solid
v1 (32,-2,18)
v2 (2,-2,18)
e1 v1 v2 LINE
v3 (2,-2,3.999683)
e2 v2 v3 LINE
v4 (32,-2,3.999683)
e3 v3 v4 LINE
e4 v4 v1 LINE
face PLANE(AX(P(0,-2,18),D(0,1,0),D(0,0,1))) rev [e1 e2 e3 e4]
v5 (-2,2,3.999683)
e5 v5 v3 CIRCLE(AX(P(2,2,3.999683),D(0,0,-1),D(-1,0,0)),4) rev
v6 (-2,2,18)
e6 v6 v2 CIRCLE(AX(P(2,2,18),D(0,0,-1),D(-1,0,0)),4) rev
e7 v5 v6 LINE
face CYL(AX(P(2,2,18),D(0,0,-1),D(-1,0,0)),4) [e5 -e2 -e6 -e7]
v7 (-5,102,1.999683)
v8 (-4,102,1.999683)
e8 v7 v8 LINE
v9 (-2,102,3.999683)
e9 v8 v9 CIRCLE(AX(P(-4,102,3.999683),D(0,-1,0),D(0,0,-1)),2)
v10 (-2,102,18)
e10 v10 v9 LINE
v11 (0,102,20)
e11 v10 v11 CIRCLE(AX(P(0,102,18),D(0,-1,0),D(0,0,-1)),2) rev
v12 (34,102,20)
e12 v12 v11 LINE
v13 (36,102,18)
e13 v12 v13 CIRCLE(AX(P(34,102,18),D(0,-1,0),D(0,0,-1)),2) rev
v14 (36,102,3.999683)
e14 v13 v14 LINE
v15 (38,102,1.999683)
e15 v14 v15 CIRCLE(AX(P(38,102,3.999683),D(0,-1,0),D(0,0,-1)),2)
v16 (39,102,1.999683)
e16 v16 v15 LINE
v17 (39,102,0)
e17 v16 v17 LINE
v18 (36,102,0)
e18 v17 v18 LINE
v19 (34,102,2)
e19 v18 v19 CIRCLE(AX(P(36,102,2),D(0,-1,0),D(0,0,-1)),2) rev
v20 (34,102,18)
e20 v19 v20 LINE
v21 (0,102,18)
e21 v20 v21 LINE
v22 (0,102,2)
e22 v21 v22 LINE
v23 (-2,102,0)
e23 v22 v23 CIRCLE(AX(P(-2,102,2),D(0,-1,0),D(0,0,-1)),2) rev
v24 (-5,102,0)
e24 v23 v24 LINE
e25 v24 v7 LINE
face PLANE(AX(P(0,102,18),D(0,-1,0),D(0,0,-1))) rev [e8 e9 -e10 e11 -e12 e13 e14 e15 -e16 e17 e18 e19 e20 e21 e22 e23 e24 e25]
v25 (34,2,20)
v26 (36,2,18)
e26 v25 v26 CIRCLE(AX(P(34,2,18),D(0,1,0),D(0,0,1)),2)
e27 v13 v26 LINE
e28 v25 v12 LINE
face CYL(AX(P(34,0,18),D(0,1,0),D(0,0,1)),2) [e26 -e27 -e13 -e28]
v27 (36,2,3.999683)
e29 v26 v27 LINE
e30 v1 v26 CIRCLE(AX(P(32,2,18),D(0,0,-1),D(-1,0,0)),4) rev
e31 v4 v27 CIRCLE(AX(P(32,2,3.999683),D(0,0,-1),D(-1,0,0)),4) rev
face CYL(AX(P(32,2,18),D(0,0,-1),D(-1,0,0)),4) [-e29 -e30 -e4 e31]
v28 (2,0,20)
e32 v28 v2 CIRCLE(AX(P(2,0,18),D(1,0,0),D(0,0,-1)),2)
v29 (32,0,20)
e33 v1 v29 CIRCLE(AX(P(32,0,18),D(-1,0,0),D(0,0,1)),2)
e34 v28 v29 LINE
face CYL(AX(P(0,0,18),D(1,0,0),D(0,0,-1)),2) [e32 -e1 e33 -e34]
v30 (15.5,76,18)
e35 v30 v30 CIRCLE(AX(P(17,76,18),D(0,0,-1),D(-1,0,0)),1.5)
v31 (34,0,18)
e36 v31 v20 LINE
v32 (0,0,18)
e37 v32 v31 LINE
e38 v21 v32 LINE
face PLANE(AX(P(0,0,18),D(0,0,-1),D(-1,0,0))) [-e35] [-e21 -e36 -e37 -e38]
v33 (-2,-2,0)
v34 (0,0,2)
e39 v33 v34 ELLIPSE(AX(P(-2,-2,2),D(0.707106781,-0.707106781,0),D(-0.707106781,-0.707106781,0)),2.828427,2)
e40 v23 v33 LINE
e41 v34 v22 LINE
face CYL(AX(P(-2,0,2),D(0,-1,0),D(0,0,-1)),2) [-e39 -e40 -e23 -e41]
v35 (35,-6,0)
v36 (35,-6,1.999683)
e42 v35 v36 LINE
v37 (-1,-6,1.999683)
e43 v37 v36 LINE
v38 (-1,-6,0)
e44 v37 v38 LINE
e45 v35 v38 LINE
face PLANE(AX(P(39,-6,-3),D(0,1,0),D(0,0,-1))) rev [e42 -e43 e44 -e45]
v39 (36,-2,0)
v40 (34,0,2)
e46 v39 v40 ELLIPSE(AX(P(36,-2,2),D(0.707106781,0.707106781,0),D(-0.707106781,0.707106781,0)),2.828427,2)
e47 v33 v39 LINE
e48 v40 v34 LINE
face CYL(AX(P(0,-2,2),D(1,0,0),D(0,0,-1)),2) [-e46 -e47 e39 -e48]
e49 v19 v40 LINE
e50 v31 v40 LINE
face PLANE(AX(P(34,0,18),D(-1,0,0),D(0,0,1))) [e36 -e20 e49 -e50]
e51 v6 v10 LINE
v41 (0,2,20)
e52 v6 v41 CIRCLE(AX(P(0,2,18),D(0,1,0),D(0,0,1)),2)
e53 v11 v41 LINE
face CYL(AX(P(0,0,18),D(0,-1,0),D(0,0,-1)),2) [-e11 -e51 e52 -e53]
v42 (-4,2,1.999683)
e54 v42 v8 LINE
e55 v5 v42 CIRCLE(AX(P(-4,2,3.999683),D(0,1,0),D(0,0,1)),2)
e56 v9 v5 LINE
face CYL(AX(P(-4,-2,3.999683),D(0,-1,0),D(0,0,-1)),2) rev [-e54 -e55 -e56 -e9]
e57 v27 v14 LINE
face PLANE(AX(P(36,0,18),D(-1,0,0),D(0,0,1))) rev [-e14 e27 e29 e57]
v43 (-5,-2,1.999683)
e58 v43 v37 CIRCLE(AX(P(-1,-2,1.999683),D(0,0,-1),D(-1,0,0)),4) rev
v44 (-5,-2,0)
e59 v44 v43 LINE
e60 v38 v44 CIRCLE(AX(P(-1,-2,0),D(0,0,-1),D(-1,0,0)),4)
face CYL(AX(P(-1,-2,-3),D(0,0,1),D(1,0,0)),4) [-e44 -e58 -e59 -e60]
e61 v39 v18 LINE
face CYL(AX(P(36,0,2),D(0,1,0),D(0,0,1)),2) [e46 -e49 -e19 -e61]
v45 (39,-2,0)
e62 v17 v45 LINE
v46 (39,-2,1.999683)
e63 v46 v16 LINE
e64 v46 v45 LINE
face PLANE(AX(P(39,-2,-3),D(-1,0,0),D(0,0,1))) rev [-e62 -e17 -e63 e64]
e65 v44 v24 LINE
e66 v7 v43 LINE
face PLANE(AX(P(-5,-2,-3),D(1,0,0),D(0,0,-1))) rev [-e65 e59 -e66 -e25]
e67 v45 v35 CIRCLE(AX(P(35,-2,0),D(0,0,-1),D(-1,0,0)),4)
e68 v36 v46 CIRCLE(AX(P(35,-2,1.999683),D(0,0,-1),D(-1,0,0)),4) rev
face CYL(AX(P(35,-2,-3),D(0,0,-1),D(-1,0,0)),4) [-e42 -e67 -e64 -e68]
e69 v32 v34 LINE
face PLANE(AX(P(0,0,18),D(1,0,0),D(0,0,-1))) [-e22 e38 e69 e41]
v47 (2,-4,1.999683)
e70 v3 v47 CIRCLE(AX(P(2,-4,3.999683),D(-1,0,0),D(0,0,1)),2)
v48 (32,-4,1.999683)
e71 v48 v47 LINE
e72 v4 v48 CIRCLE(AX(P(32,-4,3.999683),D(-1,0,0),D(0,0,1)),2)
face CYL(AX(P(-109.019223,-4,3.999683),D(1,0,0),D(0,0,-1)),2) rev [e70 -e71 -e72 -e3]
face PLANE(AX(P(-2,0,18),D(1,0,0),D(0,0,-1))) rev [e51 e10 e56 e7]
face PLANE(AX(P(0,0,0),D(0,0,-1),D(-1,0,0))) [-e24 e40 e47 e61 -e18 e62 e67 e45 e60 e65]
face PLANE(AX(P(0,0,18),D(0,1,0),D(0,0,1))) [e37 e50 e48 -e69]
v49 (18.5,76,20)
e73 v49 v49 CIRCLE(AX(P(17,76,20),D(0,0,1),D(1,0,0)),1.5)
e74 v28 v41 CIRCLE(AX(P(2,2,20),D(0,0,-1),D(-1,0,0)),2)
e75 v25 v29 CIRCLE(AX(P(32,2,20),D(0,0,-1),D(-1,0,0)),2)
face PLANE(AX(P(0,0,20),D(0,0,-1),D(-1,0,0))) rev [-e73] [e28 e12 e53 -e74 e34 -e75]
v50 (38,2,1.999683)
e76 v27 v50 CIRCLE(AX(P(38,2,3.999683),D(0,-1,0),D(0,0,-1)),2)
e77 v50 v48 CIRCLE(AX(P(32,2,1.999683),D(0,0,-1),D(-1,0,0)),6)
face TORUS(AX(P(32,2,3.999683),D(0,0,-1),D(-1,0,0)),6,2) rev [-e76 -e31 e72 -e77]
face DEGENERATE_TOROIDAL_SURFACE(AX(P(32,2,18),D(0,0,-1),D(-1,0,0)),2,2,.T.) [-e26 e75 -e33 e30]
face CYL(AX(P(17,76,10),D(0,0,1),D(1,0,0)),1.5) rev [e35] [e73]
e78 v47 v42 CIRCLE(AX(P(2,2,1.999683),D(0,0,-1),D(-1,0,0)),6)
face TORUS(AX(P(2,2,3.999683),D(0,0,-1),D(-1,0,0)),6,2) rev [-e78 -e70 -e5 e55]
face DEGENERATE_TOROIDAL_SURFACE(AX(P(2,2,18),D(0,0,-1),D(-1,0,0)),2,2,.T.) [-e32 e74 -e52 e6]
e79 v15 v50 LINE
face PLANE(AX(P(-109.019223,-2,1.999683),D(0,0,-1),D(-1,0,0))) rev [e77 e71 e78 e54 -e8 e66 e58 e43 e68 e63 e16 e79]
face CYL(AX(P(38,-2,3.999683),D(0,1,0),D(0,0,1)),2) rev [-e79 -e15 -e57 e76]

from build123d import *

# Parameters (mm, degrees)
ESQUISSE1_W             = 34
ESQUISSE1_H             = 100
BOSS_EXTRU_1_DEPTH      = 18
COQUE1_T                = 2
ESQUISSE2_W             = 34
ESQUISSE2_H             = 18
ENL_V_MAT_EXTRU_1_DEPTH = 18
CONG_1_R                = 2
ESQUISSE5_W             = 1.999683034
ESQUISSE5_H             = 104
BOSS_EXTRU_2_DEPTH      = 3
ESQUISSE6_W             = 1.999683034
ESQUISSE6_H             = 104
BOSS_EXTRU_3_DEPTH      = 3
ESQUISSE7_W             = 44
ESQUISSE7_H             = 1.999683034
BOSS_EXTRU_4_DEPTH      = 4
CONG_2_R                = 4
CONG_3_R                = 2
CONG_5_R                = 2
ESQUISSE8_R             = 1.5
ENL_V_MAT_EXTRU_2_DEPTH = 10


with BuildPart() as part:
    # Esquisse1 → Boss.-Extru.1 (new body)
    with BuildSketch(Plane.XY):
        with Locations((17, 50)):
            Rectangle(ESQUISSE1_W, ESQUISSE1_H)
    extrude(amount=BOSS_EXTRU_1_DEPTH)

    # Coque1
    coque1_openings = [part.faces().sort_by_distance(p)[0] for p in [
        (17, 50, 0),
    ]]
    offset(amount=COQUE1_T, openings=coque1_openings, kind=Kind.INTERSECTION)

    # Esquisse2 → Enlèv. mat.-Extru.1 (cut)
    with BuildSketch(Plane.XZ.offset(-100)):
        with Locations((17, 9)):
            Rectangle(ESQUISSE2_W, ESQUISSE2_H)
    extrude(amount=-ENL_V_MAT_EXTRU_1_DEPTH, mode=Mode.SUBTRACT)

    # Congé1
    cong_1_edges = [part.edges().sort_by_distance(p)[0] for p in [
        (36, 50, 20),
        (-2, 50, 20),
        (17, -2, 20),
    ]]
    fillet(cong_1_edges, radius=CONG_1_R)

    # Esquisse5 → Boss.-Extru.2 (add)
    with BuildSketch(Plane.ZY.offset(2)):
        with Locations((0.999841517, 50)):
            Rectangle(ESQUISSE5_W, ESQUISSE5_H)
    extrude(amount=BOSS_EXTRU_2_DEPTH)

    # Esquisse6 → Boss.-Extru.3 (add)
    with BuildSketch(Plane(origin=(36, 0, 0), x_dir=(0, 0, -1), z_dir=(1, 0, 0))):
        with Locations((-0.999841517, 50)):
            Rectangle(ESQUISSE6_W, ESQUISSE6_H)
    extrude(amount=BOSS_EXTRU_3_DEPTH)

    # Esquisse7 → Boss.-Extru.4 (add)
    with BuildSketch(Plane.XZ.offset(2)):
        with Locations((17, 0.999841517)):
            Rectangle(ESQUISSE7_W, ESQUISSE7_H)
    extrude(amount=BOSS_EXTRU_4_DEPTH)

    # Congé2
    # the kernel refuses this fillet: 4 mm, written as the material it takes off along each edge
    with BuildSketch(Plane(origin=(2, 2, 20), x_dir=(-1, 0, 0), z_dir=(0, 1, 0))) as cong_2_piece_1:
        with BuildLine():
            CenterArc((2, -2), 2, 0, 90)
            Line((4, -2), (4, 0))
            Line((4, 0), (2, 0))
        make_face()
    revolve(axis=Axis((2, 2, 20), (0, 0, 1)), revolution_arc=90, mode=Mode.SUBTRACT)
    with BuildSketch(Plane(origin=(32, 2, 20), x_dir=(0, -1, 0), z_dir=(-1, 0, 0))) as cong_2_piece_2:
        with BuildLine():
            CenterArc((2, -2), 2, 0, 90)
            Line((4, -2), (4, 0))
            Line((4, 0), (2, 0))
        make_face()
    revolve(axis=Axis((32, 2, 20), (0, 0, 1)), revolution_arc=90, mode=Mode.SUBTRACT)
    with BuildSketch(Plane(origin=(36, -2, 1.999683034), x_dir=(-1, 0, 0), z_dir=(0, 0, 1)), Plane(origin=(-2, -2, 20), x_dir=(1, 0, 0), z_dir=(0, 0, -1))) as cong_2_piece_3:
        with BuildLine():
            CenterArc((CONG_2_R, -CONG_2_R), CONG_2_R, 90, 90)
            Line((0, -CONG_2_R), (0, 0))
            Line((0, 0), (CONG_2_R, 0))
        make_face()
    extrude(amount=18.000316966, mode=Mode.SUBTRACT)
    with BuildSketch(Plane(origin=(39, -6, 11.999683034), x_dir=(0, 1, 0), z_dir=(0, 0, -1))) as cong_2_piece_4:
        with BuildLine():
            CenterArc((CONG_2_R, -CONG_2_R), CONG_2_R, 90, 90)
            Line((0, -CONG_2_R), (0, 0))
            Line((0, 0), (CONG_2_R, 0))
        make_face()
    extrude(amount=21.999683034, mode=Mode.SUBTRACT)
    with BuildSketch(Plane(origin=(-5, -6, -10), x_dir=(1, 0, 0), z_dir=(0, 0, 1))) as cong_2_piece_5:
        with BuildLine():
            CenterArc((CONG_2_R, CONG_2_R), CONG_2_R, 180, 90)
            Line((0, CONG_2_R), (0, 0))
            Line((0, 0), (CONG_2_R, 0))
        make_face()
    extrude(amount=21.999683034, mode=Mode.SUBTRACT)

    # Congé3
    cong_3_edges = [part.edges().sort_by_distance(p)[0] for p in [
        (17, -2, 1.999683034),
        (-2, 52, 1.999683034),
        (34.828427125, -0.828427125, 1.999683034),
        (-0.828427125, -0.828427125, 1.999683034),
        (36, 52, 1.999683034),
    ]]
    fillet(cong_3_edges, radius=CONG_3_R)

    # Congé5
    cong_5_edges = [part.edges().sort_by_distance(p)[0] for p in [
        (0, 51, 0),
        (17, 0, 0),
        (34, 51, 0),
    ]]
    fillet(cong_5_edges, radius=CONG_5_R)

    # Esquisse8 → Enlèv. mat.-Extru.2 (cut)
    with BuildSketch(Plane.XY.offset(20)):
        with Locations((17, 76)):
            Circle(ESQUISSE8_R)
    extrude(amount=-ENL_V_MAT_EXTRU_2_DEPTH, mode=Mode.SUBTRACT)


solid = part.part
